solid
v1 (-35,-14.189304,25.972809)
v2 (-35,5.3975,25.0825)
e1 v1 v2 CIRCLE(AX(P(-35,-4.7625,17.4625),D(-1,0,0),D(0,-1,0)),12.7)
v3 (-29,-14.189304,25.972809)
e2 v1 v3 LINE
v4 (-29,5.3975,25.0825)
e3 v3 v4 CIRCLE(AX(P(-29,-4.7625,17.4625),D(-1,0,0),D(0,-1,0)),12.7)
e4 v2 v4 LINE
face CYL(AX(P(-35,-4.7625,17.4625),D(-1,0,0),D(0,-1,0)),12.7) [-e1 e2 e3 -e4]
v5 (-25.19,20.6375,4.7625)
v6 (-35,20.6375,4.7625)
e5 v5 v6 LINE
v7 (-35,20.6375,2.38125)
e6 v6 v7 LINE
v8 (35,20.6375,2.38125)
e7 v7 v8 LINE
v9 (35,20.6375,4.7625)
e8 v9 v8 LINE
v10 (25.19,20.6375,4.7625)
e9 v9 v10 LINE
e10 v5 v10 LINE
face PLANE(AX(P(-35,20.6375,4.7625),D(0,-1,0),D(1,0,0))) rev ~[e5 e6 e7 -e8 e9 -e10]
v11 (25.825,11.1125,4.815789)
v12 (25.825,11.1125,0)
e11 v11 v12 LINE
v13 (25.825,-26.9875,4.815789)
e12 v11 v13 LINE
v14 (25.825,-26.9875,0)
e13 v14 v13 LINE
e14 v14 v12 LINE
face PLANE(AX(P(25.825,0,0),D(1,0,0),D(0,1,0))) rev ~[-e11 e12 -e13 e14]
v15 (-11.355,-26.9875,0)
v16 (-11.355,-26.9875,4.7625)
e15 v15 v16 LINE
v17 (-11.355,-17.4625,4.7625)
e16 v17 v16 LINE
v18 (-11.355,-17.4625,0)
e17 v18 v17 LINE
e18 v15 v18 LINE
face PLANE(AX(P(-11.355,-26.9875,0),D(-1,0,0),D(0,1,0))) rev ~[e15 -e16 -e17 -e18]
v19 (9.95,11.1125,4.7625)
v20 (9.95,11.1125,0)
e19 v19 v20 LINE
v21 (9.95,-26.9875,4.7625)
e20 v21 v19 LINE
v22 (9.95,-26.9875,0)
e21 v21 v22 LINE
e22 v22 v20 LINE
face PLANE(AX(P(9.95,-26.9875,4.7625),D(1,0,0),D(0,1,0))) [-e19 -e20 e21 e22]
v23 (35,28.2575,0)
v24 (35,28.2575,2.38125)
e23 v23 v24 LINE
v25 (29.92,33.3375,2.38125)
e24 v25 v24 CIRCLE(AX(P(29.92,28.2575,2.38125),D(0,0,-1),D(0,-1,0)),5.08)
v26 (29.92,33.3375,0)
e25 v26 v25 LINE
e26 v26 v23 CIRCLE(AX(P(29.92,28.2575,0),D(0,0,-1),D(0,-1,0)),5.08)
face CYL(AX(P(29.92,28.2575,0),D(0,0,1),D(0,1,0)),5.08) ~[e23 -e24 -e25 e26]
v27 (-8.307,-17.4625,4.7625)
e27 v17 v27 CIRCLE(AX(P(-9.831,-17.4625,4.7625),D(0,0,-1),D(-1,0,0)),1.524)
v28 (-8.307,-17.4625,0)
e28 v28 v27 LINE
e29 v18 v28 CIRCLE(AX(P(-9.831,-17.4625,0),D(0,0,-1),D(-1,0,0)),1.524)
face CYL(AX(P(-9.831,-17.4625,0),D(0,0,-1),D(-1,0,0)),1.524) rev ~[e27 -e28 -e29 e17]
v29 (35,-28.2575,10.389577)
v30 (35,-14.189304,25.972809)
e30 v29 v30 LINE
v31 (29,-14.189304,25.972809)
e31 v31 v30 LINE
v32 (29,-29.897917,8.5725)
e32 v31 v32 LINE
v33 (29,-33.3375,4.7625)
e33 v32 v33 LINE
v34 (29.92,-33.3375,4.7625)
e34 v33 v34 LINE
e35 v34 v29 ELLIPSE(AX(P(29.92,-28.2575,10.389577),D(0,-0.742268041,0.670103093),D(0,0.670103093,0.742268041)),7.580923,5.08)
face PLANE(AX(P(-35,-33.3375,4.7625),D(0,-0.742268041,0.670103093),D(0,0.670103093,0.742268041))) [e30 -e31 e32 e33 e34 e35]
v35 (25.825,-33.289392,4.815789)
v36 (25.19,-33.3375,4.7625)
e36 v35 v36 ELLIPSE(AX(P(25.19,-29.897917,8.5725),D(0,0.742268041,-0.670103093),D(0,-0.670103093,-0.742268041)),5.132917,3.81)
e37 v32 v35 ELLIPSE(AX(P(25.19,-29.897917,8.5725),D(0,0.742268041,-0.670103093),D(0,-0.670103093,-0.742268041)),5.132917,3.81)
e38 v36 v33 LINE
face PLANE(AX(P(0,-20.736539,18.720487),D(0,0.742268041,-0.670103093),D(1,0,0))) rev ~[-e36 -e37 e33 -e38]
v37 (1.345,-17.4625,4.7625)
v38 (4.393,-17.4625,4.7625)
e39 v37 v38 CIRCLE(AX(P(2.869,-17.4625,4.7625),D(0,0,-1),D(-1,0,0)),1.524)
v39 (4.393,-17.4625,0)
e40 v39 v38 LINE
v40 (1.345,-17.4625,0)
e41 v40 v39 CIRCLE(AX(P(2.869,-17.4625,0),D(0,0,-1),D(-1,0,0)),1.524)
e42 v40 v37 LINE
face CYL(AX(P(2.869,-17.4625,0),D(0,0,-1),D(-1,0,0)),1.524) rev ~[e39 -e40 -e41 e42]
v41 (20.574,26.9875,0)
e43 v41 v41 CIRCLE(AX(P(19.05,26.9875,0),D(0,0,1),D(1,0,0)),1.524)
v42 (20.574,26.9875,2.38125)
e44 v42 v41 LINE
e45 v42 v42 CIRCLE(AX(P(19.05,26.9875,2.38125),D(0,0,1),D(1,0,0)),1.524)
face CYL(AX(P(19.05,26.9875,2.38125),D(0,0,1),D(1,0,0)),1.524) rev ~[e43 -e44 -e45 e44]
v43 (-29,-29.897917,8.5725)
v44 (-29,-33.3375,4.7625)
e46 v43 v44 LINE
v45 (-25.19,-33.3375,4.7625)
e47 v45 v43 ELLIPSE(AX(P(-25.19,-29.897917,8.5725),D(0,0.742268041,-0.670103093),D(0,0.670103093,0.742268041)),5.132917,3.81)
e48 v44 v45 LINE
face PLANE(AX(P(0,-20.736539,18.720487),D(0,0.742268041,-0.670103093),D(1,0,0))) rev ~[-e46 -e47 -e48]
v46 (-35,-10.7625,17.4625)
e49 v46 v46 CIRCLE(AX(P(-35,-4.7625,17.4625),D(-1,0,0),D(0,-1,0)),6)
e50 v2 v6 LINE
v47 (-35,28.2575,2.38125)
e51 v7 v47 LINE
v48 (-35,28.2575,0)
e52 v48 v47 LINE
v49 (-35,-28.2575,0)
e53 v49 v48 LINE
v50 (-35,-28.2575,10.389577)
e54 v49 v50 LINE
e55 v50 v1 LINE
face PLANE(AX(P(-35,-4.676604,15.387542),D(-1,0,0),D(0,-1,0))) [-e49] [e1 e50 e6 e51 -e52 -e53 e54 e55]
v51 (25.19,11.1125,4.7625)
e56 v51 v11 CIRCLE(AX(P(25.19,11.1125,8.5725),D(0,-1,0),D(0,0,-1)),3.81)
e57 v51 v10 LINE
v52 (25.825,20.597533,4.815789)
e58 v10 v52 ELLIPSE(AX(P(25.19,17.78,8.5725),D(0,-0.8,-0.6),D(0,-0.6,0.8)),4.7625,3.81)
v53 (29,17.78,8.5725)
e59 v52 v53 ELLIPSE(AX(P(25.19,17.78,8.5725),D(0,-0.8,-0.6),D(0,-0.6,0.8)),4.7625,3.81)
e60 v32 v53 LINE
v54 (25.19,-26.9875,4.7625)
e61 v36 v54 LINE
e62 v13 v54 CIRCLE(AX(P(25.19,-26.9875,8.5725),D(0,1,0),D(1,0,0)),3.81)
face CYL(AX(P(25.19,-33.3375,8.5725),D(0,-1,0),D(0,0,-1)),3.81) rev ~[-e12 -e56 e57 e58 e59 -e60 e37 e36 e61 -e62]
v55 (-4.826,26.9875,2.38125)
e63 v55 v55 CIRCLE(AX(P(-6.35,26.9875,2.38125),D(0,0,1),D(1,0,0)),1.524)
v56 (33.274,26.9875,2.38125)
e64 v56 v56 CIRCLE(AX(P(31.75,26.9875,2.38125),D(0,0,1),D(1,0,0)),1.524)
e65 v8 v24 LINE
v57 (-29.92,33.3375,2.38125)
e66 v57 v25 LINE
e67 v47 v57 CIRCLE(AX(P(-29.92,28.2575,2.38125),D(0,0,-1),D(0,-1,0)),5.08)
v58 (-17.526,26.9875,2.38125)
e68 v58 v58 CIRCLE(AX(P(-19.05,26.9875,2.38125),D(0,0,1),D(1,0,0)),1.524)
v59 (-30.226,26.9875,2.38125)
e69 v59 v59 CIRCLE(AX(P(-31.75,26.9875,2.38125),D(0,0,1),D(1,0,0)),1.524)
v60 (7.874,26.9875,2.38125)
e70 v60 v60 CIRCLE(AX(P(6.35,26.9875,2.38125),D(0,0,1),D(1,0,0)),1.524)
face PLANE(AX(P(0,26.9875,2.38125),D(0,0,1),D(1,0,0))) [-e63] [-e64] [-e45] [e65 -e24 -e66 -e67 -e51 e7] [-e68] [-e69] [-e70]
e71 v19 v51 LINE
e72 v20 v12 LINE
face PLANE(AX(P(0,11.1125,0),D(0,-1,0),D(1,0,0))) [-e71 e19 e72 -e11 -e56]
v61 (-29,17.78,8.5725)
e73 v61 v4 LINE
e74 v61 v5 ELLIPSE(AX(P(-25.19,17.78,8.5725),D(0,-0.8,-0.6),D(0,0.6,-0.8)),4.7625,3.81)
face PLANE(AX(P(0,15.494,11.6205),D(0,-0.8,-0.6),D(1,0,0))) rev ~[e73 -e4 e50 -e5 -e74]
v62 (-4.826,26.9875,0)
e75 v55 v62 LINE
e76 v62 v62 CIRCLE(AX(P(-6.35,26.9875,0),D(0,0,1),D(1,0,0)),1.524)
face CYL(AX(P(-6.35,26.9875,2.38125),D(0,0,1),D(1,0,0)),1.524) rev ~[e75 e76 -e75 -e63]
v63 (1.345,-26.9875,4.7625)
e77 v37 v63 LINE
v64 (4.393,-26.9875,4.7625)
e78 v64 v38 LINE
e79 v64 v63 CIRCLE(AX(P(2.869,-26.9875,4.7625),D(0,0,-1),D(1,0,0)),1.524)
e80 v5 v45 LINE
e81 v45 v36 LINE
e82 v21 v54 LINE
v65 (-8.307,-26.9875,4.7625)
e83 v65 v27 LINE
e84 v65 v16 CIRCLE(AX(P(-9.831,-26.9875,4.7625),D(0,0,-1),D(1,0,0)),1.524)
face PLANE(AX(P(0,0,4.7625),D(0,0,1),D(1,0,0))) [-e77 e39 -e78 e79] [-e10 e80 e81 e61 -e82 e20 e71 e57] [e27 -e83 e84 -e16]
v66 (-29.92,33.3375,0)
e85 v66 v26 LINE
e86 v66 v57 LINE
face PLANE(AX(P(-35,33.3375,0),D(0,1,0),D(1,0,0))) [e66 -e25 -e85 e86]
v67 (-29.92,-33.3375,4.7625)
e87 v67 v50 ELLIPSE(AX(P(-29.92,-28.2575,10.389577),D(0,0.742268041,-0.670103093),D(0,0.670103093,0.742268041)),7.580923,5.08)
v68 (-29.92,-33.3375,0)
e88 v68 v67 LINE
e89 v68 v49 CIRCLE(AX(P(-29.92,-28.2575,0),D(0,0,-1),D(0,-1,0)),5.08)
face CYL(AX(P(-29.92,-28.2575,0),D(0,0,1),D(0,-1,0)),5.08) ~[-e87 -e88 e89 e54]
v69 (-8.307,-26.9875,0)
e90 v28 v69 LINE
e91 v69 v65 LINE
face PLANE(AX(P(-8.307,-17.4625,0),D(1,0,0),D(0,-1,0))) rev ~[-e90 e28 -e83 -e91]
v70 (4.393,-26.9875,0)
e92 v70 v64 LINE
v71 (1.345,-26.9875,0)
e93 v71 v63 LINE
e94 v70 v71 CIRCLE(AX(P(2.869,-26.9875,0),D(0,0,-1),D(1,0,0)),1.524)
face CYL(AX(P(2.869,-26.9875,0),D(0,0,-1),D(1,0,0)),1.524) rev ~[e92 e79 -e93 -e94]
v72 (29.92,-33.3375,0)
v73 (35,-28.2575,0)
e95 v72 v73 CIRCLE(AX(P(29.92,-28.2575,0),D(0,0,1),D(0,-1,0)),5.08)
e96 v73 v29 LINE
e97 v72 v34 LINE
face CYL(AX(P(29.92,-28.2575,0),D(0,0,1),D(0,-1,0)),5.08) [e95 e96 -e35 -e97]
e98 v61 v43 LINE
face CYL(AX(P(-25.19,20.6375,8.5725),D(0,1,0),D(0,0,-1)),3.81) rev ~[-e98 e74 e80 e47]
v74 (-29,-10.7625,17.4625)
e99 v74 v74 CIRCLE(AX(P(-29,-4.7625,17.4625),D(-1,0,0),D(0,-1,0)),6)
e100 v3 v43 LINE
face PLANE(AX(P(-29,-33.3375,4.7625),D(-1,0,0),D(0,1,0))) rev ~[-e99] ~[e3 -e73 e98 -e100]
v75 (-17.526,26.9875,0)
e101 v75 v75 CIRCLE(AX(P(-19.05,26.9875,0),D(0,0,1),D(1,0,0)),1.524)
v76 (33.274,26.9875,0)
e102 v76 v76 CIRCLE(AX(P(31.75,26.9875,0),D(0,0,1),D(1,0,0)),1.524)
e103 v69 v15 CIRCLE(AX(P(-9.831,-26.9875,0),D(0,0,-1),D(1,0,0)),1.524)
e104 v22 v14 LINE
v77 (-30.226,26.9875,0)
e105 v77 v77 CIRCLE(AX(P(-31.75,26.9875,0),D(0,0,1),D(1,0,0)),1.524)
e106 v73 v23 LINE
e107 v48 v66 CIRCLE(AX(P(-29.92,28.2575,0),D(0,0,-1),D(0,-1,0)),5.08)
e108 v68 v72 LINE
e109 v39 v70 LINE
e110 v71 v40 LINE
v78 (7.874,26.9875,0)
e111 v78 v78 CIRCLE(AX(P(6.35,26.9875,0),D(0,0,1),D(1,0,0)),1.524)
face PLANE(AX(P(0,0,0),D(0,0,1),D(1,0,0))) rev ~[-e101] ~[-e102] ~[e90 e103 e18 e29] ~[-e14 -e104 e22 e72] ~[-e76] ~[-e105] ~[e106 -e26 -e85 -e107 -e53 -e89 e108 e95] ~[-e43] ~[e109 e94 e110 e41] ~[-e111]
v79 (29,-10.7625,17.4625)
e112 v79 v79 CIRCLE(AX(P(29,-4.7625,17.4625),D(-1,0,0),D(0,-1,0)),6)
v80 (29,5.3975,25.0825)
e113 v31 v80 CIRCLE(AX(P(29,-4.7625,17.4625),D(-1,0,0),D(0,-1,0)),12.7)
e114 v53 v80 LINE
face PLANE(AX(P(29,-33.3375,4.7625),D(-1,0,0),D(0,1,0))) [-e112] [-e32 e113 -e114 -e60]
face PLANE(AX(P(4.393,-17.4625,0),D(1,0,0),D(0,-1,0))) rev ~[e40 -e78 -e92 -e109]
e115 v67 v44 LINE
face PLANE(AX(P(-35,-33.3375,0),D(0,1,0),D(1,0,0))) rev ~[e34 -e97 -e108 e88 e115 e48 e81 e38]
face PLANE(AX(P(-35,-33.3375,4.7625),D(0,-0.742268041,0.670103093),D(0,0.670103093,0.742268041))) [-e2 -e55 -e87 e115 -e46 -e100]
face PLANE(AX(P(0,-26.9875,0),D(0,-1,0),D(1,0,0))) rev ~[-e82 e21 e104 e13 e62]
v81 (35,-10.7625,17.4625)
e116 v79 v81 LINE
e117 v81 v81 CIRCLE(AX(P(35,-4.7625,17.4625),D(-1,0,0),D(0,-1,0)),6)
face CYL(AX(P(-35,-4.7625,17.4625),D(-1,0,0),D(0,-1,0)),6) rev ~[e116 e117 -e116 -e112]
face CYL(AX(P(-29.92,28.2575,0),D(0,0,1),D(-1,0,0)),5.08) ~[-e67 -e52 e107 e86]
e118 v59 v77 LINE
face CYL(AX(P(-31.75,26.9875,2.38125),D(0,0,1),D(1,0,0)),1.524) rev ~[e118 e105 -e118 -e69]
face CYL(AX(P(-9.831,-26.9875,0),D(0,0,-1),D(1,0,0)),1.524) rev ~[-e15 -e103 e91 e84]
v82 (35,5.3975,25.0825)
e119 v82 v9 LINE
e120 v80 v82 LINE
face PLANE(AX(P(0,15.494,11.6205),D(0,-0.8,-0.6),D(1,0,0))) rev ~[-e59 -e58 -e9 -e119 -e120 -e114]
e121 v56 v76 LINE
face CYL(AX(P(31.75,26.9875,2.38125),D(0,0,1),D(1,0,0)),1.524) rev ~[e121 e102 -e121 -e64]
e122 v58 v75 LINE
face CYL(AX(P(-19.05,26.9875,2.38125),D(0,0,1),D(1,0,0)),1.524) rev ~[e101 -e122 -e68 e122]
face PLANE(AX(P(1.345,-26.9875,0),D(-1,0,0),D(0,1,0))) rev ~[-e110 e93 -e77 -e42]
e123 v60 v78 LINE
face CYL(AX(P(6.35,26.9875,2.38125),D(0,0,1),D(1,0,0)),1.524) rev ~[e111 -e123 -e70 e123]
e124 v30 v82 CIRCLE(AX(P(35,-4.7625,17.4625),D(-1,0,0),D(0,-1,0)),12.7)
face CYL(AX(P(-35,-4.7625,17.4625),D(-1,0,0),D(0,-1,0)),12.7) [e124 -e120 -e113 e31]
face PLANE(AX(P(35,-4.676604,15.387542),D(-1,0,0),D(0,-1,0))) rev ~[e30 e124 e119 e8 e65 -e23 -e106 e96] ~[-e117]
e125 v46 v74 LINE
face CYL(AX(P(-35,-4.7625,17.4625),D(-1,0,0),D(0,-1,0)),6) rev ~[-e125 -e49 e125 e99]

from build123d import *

# Parameters (mm, degrees)
F0_W          = 70
F0_H          = 66.675
F1_DEPTH      = 4.7625
F2_R          = 6
F3_DEPTH      = 70
F4_W          = 58
F4_H          = 53.975
F5_DEPTH      = 25.401
F6_W          = 15.875
F6_H          = 38.1
F7_DEPTH      = 4.7625
F9_DEPTH      = 25.4
F10_W         = 70
F10_H         = 12.7
F11_DEPTH     = 2.38125
F12_R         = 1.524
F13_DEPTH     = 2.38125
F14_R         = 5.08
F15_T4_DEPTH  = 53.975
F15_T10_DEPTH = 53.975
F15_T17_DEPTH = 53.975
F15_T24_DEPTH = 53.975
F15_T31_DEPTH = 53.975
F15_T38_DEPTH = 53.975
F16_R         = 5.08


# Not quite as in the source:
# - a fillet or chamfer that OpenCascade refuses, or shapes differently, is made with other operations: its cross-section is extruded or revolved along the edge and cut away or added
# - a feature of the source that left no trace in its solid (it failed there, or was rolled back) is left out


with BuildPart() as f1:
    # F0 (on Top) → F1 (new body)
    with BuildSketch(Plane.XY):
        Rectangle(F0_W, F0_H)
    extrude(amount=F1_DEPTH)

    # F2 (on face) → F3 (join, through all)
    with BuildSketch(Plane(origin=(-35, 0, 0), x_dir=(0, -1, 0), z_dir=(-1, 0, 0))):
        with BuildLine():
            ThreePointArc((-5.3975, 25.0825), (-7.2857778852, 21.4785926284), (-7.9375, 17.4625))
            Line((-7.9375, 17.4625), (-7.9375, 4.7625))
            Line((-7.9375, 4.7625), (17.4625, 4.7625))
            Line((17.4625, 4.7625), (17.4625, 17.4625))
            ThreePointArc((17.4625, 17.4625), (16.6159891988, 22.0215343072), (14.1893041237, 25.9728092784))
            ThreePointArc((14.1893041237, 25.9728092784), (4.1858227063, 30.1494004607), (-5.3975, 25.0825))
        make_face()
        with Locations((4.7625, 17.4625)):
            Circle(F2_R, mode=Mode.SUBTRACT)
        with BuildLine():
            Line((-7.9375, 4.7625), (-7.9375, 17.4625))
            ThreePointArc((-7.9375, 17.4625), (-7.2857778852, 21.4785926284), (-5.3975, 25.0825))
            Line((-5.3975, 25.0825), (-20.6375, 4.7625))
            Line((-20.6375, 4.7625), (-7.9375, 4.7625))
        make_face()
        with BuildLine():
            Line((17.4625, 17.4625), (17.4625, 4.7625))
            Line((17.4625, 4.7625), (33.3375, 4.7625))
            Line((33.3375, 4.7625), (14.1893041237, 25.9728092784))
            ThreePointArc((14.1893041237, 25.9728092784), (16.6159891988, 22.0215343072), (17.4625, 17.4625))
        make_face()
    extrude(amount=-F3_DEPTH)

    # F4 (on face) → F5 (cut, through all)
    with BuildSketch(Plane.XY.offset(4.7625)):
        with Locations((0, -6.35)):
            Rectangle(F4_W, F4_H)
    extrude(amount=F5_DEPTH, mode=Mode.SUBTRACT)

    # F6 (on face) → F7 (cut, through all)
    with BuildSketch(Plane.XY.offset(4.7625)):
        with Locations((17.8875, -7.9375)):
            Rectangle(F6_W, F6_H)
    extrude(amount=-F7_DEPTH, mode=Mode.SUBTRACT)

    # F8 (on face) → F9 (cut)
    with BuildSketch(Plane(origin=(0, 0, 0), x_dir=(1, 0, 0), z_dir=(0, 0, -1))):
        with BuildLine():
            Line((1.345, 26.9875), (1.345, 17.4625))
            ThreePointArc((1.345, 17.4625), (2.869, 15.9385), (4.393, 17.4625))
            Line((4.393, 17.4625), (4.393, 26.9875))
            ThreePointArc((4.393, 26.9875), (2.869, 28.5115), (1.345, 26.9875))
        make_face()
        with BuildLine():
            Line((-11.355, 26.9875), (-11.355, 17.4625))
            ThreePointArc((-11.355, 17.4625), (-9.831, 15.9385), (-8.307, 17.4625))
            Line((-8.307, 17.4625), (-8.307, 26.9875))
            ThreePointArc((-8.307, 26.9875), (-9.831, 28.5115), (-11.355, 26.9875))
        make_face()
    extrude(amount=-F9_DEPTH, mode=Mode.SUBTRACT)

    # F10 (on face) → F11 (cut)
    with BuildSketch(Plane.XY.offset(4.7625)):
        with Locations((0, 26.9875)):
            Rectangle(F10_W, F10_H)
    extrude(amount=-F11_DEPTH, mode=Mode.SUBTRACT)

    # F12 (on face) → F13 (cut, through all)
    with BuildSketch(Plane.XY.offset(2.38125)):
        with Locations((-31.75, 26.9875)):
            Circle(F12_R)
        with Locations((-19.05, 26.9875)):
            Circle(F12_R)
        with Locations((-6.35, 26.9875)):
            Circle(F12_R)
        with Locations((6.35, 26.9875)):
            Circle(F12_R)
        with Locations((19.05, 26.9875)):
            Circle(F12_R)
        with Locations((31.75, 26.9875)):
            Circle(F12_R)
    extrude(amount=-F13_DEPTH, mode=Mode.SUBTRACT)

    # F14
    f14_edges = [f1.edges().sort_by_distance(p)[0] for p in [
        (-35, 33.3375, 1.190625),
        (35, 33.3375, 1.190625),
    ]]
    fillet(f14_edges, radius=F14_R)

    # F15: fillet of radius 3.81 on 2 edges, made by hand


with BuildPart() as f15_tool2:
    # F15_s3 → F15_t4 (new body)
    with BuildSketch(Plane.XZ.offset(-20.6375)):
        with BuildLine():
            ThreePointArc((-25.19, 4.7625), (-27.8840768363, 5.8784231637), (-29, 8.5725))
            Line((-29, 8.5725), (-29, 4.7625))
            Line((-29, 4.7625), (-25.19, 4.7625))
        make_face()
    extrude(amount=F15_T4_DEPTH)

    split(bisect_by=Plane(origin=(0, -20.7365394835, 18.7204870337), x_dir=(1, 0, 0), z_dir=(0, 0.7422680412, -0.6701030928)), keep=Keep.TOP)

    split(bisect_by=Plane(origin=(0, 15.494, 11.6205), x_dir=(1, 0, 0), z_dir=(0, -0.8, -0.6)), keep=Keep.TOP)


with BuildPart() as f1_1:
    add(f1.part)

    # F15_t1: union F15_tool2
    add(f15_tool2.part)


with BuildPart() as f15_tool8:
    # F15_s9 → F15_t10 (new body)
    with BuildSketch(Plane.XZ.offset(33.3375)):
        with BuildLine():
            ThreePointArc((25.19, 4.7625), (27.8840768363, 5.8784231637), (29, 8.5725))
            Line((29, 8.5725), (29, 4.7625))
            Line((29, 4.7625), (25.19, 4.7625))
        make_face()
    extrude(amount=-F15_T10_DEPTH)

    split(bisect_by=Plane(origin=(0, -20.7365394835, 18.7204870337), x_dir=(1, 0, 0), z_dir=(0, 0.7422680412, -0.6701030928)), keep=Keep.TOP)

    split(bisect_by=Plane.XZ.offset(26.9875), keep=Keep.TOP)

    split(bisect_by=Plane.YZ.offset(25.825), keep=Keep.BOTTOM)


with BuildPart() as f1_2:
    add(f1_1.part)

    # F15_t7: union F15_tool8
    add(f15_tool8.part)


with BuildPart() as f15_tool15:
    # F15_s16 → F15_t17 (new body)
    with BuildSketch(Plane.XZ.offset(33.3375)):
        with BuildLine():
            ThreePointArc((25.19, 4.7625), (27.8840768363, 5.8784231637), (29, 8.5725))
            Line((29, 8.5725), (29, 4.7625))
            Line((29, 4.7625), (25.19, 4.7625))
        make_face()
    extrude(amount=-F15_T17_DEPTH)

    split(bisect_by=Plane(origin=(0, -20.7365394835, 18.7204870337), x_dir=(1, 0, 0), z_dir=(0, 0.7422680412, -0.6701030928)), keep=Keep.TOP)

    split(bisect_by=Plane.XZ.offset(26.9875), keep=Keep.TOP)

    split(bisect_by=Plane.YZ.offset(25.825), keep=Keep.TOP)


with BuildPart() as f1_3:
    add(f1_2.part)

    # F15_t14: union F15_tool15
    add(f15_tool15.part)


with BuildPart() as f15_tool22:
    # F15_s23 → F15_t24 (new body)
    with BuildSketch(Plane.XZ.offset(33.3375)):
        with BuildLine():
            ThreePointArc((25.19, 4.7625), (27.8840768363, 5.8784231637), (29, 8.5725))
            Line((29, 8.5725), (29, 4.7625))
            Line((29, 4.7625), (25.19, 4.7625))
        make_face()
    extrude(amount=-F15_T24_DEPTH)

    split(bisect_by=Plane.XZ.offset(26.9875), keep=Keep.BOTTOM)

    split(bisect_by=Plane.YZ.offset(25.825), keep=Keep.TOP)

    split(bisect_by=Plane.XZ.offset(-11.1125), keep=Keep.TOP)


with BuildPart() as f1_4:
    add(f1_3.part)

    # F15_t21: union F15_tool22
    add(f15_tool22.part)


with BuildPart() as f15_tool29:
    # F15_s30 → F15_t31 (new body)
    with BuildSketch(Plane.XZ.offset(33.3375)):
        with BuildLine():
            ThreePointArc((25.19, 4.7625), (27.8840768363, 5.8784231637), (29, 8.5725))
            Line((29, 8.5725), (29, 4.7625))
            Line((29, 4.7625), (25.19, 4.7625))
        make_face()
    extrude(amount=-F15_T31_DEPTH)

    split(bisect_by=Plane(origin=(0, 15.494, 11.6205), x_dir=(1, 0, 0), z_dir=(0, -0.8, -0.6)), keep=Keep.TOP)

    split(bisect_by=Plane.YZ.offset(25.825), keep=Keep.BOTTOM)

    split(bisect_by=Plane.XZ.offset(-11.1125), keep=Keep.BOTTOM)


with BuildPart() as f1_5:
    add(f1_4.part)

    # F15_t28: union F15_tool29
    add(f15_tool29.part)


with BuildPart() as f15_tool36:
    # F15_s37 → F15_t38 (new body)
    with BuildSketch(Plane.XZ.offset(33.3375)):
        with BuildLine():
            ThreePointArc((25.19, 4.7625), (27.8840768363, 5.8784231637), (29, 8.5725))
            Line((29, 8.5725), (29, 4.7625))
            Line((29, 4.7625), (25.19, 4.7625))
        make_face()
    extrude(amount=-F15_T38_DEPTH)

    split(bisect_by=Plane(origin=(0, 15.494, 11.6205), x_dir=(1, 0, 0), z_dir=(0, -0.8, -0.6)), keep=Keep.TOP)

    split(bisect_by=Plane.YZ.offset(25.825), keep=Keep.TOP)

    split(bisect_by=Plane.XZ.offset(-11.1125), keep=Keep.BOTTOM)


with BuildPart() as f1_6:
    add(f1_5.part)

    # F15_t35: union F15_tool36
    add(f15_tool36.part)

    # F16
    f16_edges = [f1_6.edges().sort_by_distance(p)[0] for p in [
        (35, -33.3375, 2.38125),
        (-35, -33.3375, 2.38125),
    ]]
    fillet(f16_edges, radius=F16_R)


solid = f1_6.part
